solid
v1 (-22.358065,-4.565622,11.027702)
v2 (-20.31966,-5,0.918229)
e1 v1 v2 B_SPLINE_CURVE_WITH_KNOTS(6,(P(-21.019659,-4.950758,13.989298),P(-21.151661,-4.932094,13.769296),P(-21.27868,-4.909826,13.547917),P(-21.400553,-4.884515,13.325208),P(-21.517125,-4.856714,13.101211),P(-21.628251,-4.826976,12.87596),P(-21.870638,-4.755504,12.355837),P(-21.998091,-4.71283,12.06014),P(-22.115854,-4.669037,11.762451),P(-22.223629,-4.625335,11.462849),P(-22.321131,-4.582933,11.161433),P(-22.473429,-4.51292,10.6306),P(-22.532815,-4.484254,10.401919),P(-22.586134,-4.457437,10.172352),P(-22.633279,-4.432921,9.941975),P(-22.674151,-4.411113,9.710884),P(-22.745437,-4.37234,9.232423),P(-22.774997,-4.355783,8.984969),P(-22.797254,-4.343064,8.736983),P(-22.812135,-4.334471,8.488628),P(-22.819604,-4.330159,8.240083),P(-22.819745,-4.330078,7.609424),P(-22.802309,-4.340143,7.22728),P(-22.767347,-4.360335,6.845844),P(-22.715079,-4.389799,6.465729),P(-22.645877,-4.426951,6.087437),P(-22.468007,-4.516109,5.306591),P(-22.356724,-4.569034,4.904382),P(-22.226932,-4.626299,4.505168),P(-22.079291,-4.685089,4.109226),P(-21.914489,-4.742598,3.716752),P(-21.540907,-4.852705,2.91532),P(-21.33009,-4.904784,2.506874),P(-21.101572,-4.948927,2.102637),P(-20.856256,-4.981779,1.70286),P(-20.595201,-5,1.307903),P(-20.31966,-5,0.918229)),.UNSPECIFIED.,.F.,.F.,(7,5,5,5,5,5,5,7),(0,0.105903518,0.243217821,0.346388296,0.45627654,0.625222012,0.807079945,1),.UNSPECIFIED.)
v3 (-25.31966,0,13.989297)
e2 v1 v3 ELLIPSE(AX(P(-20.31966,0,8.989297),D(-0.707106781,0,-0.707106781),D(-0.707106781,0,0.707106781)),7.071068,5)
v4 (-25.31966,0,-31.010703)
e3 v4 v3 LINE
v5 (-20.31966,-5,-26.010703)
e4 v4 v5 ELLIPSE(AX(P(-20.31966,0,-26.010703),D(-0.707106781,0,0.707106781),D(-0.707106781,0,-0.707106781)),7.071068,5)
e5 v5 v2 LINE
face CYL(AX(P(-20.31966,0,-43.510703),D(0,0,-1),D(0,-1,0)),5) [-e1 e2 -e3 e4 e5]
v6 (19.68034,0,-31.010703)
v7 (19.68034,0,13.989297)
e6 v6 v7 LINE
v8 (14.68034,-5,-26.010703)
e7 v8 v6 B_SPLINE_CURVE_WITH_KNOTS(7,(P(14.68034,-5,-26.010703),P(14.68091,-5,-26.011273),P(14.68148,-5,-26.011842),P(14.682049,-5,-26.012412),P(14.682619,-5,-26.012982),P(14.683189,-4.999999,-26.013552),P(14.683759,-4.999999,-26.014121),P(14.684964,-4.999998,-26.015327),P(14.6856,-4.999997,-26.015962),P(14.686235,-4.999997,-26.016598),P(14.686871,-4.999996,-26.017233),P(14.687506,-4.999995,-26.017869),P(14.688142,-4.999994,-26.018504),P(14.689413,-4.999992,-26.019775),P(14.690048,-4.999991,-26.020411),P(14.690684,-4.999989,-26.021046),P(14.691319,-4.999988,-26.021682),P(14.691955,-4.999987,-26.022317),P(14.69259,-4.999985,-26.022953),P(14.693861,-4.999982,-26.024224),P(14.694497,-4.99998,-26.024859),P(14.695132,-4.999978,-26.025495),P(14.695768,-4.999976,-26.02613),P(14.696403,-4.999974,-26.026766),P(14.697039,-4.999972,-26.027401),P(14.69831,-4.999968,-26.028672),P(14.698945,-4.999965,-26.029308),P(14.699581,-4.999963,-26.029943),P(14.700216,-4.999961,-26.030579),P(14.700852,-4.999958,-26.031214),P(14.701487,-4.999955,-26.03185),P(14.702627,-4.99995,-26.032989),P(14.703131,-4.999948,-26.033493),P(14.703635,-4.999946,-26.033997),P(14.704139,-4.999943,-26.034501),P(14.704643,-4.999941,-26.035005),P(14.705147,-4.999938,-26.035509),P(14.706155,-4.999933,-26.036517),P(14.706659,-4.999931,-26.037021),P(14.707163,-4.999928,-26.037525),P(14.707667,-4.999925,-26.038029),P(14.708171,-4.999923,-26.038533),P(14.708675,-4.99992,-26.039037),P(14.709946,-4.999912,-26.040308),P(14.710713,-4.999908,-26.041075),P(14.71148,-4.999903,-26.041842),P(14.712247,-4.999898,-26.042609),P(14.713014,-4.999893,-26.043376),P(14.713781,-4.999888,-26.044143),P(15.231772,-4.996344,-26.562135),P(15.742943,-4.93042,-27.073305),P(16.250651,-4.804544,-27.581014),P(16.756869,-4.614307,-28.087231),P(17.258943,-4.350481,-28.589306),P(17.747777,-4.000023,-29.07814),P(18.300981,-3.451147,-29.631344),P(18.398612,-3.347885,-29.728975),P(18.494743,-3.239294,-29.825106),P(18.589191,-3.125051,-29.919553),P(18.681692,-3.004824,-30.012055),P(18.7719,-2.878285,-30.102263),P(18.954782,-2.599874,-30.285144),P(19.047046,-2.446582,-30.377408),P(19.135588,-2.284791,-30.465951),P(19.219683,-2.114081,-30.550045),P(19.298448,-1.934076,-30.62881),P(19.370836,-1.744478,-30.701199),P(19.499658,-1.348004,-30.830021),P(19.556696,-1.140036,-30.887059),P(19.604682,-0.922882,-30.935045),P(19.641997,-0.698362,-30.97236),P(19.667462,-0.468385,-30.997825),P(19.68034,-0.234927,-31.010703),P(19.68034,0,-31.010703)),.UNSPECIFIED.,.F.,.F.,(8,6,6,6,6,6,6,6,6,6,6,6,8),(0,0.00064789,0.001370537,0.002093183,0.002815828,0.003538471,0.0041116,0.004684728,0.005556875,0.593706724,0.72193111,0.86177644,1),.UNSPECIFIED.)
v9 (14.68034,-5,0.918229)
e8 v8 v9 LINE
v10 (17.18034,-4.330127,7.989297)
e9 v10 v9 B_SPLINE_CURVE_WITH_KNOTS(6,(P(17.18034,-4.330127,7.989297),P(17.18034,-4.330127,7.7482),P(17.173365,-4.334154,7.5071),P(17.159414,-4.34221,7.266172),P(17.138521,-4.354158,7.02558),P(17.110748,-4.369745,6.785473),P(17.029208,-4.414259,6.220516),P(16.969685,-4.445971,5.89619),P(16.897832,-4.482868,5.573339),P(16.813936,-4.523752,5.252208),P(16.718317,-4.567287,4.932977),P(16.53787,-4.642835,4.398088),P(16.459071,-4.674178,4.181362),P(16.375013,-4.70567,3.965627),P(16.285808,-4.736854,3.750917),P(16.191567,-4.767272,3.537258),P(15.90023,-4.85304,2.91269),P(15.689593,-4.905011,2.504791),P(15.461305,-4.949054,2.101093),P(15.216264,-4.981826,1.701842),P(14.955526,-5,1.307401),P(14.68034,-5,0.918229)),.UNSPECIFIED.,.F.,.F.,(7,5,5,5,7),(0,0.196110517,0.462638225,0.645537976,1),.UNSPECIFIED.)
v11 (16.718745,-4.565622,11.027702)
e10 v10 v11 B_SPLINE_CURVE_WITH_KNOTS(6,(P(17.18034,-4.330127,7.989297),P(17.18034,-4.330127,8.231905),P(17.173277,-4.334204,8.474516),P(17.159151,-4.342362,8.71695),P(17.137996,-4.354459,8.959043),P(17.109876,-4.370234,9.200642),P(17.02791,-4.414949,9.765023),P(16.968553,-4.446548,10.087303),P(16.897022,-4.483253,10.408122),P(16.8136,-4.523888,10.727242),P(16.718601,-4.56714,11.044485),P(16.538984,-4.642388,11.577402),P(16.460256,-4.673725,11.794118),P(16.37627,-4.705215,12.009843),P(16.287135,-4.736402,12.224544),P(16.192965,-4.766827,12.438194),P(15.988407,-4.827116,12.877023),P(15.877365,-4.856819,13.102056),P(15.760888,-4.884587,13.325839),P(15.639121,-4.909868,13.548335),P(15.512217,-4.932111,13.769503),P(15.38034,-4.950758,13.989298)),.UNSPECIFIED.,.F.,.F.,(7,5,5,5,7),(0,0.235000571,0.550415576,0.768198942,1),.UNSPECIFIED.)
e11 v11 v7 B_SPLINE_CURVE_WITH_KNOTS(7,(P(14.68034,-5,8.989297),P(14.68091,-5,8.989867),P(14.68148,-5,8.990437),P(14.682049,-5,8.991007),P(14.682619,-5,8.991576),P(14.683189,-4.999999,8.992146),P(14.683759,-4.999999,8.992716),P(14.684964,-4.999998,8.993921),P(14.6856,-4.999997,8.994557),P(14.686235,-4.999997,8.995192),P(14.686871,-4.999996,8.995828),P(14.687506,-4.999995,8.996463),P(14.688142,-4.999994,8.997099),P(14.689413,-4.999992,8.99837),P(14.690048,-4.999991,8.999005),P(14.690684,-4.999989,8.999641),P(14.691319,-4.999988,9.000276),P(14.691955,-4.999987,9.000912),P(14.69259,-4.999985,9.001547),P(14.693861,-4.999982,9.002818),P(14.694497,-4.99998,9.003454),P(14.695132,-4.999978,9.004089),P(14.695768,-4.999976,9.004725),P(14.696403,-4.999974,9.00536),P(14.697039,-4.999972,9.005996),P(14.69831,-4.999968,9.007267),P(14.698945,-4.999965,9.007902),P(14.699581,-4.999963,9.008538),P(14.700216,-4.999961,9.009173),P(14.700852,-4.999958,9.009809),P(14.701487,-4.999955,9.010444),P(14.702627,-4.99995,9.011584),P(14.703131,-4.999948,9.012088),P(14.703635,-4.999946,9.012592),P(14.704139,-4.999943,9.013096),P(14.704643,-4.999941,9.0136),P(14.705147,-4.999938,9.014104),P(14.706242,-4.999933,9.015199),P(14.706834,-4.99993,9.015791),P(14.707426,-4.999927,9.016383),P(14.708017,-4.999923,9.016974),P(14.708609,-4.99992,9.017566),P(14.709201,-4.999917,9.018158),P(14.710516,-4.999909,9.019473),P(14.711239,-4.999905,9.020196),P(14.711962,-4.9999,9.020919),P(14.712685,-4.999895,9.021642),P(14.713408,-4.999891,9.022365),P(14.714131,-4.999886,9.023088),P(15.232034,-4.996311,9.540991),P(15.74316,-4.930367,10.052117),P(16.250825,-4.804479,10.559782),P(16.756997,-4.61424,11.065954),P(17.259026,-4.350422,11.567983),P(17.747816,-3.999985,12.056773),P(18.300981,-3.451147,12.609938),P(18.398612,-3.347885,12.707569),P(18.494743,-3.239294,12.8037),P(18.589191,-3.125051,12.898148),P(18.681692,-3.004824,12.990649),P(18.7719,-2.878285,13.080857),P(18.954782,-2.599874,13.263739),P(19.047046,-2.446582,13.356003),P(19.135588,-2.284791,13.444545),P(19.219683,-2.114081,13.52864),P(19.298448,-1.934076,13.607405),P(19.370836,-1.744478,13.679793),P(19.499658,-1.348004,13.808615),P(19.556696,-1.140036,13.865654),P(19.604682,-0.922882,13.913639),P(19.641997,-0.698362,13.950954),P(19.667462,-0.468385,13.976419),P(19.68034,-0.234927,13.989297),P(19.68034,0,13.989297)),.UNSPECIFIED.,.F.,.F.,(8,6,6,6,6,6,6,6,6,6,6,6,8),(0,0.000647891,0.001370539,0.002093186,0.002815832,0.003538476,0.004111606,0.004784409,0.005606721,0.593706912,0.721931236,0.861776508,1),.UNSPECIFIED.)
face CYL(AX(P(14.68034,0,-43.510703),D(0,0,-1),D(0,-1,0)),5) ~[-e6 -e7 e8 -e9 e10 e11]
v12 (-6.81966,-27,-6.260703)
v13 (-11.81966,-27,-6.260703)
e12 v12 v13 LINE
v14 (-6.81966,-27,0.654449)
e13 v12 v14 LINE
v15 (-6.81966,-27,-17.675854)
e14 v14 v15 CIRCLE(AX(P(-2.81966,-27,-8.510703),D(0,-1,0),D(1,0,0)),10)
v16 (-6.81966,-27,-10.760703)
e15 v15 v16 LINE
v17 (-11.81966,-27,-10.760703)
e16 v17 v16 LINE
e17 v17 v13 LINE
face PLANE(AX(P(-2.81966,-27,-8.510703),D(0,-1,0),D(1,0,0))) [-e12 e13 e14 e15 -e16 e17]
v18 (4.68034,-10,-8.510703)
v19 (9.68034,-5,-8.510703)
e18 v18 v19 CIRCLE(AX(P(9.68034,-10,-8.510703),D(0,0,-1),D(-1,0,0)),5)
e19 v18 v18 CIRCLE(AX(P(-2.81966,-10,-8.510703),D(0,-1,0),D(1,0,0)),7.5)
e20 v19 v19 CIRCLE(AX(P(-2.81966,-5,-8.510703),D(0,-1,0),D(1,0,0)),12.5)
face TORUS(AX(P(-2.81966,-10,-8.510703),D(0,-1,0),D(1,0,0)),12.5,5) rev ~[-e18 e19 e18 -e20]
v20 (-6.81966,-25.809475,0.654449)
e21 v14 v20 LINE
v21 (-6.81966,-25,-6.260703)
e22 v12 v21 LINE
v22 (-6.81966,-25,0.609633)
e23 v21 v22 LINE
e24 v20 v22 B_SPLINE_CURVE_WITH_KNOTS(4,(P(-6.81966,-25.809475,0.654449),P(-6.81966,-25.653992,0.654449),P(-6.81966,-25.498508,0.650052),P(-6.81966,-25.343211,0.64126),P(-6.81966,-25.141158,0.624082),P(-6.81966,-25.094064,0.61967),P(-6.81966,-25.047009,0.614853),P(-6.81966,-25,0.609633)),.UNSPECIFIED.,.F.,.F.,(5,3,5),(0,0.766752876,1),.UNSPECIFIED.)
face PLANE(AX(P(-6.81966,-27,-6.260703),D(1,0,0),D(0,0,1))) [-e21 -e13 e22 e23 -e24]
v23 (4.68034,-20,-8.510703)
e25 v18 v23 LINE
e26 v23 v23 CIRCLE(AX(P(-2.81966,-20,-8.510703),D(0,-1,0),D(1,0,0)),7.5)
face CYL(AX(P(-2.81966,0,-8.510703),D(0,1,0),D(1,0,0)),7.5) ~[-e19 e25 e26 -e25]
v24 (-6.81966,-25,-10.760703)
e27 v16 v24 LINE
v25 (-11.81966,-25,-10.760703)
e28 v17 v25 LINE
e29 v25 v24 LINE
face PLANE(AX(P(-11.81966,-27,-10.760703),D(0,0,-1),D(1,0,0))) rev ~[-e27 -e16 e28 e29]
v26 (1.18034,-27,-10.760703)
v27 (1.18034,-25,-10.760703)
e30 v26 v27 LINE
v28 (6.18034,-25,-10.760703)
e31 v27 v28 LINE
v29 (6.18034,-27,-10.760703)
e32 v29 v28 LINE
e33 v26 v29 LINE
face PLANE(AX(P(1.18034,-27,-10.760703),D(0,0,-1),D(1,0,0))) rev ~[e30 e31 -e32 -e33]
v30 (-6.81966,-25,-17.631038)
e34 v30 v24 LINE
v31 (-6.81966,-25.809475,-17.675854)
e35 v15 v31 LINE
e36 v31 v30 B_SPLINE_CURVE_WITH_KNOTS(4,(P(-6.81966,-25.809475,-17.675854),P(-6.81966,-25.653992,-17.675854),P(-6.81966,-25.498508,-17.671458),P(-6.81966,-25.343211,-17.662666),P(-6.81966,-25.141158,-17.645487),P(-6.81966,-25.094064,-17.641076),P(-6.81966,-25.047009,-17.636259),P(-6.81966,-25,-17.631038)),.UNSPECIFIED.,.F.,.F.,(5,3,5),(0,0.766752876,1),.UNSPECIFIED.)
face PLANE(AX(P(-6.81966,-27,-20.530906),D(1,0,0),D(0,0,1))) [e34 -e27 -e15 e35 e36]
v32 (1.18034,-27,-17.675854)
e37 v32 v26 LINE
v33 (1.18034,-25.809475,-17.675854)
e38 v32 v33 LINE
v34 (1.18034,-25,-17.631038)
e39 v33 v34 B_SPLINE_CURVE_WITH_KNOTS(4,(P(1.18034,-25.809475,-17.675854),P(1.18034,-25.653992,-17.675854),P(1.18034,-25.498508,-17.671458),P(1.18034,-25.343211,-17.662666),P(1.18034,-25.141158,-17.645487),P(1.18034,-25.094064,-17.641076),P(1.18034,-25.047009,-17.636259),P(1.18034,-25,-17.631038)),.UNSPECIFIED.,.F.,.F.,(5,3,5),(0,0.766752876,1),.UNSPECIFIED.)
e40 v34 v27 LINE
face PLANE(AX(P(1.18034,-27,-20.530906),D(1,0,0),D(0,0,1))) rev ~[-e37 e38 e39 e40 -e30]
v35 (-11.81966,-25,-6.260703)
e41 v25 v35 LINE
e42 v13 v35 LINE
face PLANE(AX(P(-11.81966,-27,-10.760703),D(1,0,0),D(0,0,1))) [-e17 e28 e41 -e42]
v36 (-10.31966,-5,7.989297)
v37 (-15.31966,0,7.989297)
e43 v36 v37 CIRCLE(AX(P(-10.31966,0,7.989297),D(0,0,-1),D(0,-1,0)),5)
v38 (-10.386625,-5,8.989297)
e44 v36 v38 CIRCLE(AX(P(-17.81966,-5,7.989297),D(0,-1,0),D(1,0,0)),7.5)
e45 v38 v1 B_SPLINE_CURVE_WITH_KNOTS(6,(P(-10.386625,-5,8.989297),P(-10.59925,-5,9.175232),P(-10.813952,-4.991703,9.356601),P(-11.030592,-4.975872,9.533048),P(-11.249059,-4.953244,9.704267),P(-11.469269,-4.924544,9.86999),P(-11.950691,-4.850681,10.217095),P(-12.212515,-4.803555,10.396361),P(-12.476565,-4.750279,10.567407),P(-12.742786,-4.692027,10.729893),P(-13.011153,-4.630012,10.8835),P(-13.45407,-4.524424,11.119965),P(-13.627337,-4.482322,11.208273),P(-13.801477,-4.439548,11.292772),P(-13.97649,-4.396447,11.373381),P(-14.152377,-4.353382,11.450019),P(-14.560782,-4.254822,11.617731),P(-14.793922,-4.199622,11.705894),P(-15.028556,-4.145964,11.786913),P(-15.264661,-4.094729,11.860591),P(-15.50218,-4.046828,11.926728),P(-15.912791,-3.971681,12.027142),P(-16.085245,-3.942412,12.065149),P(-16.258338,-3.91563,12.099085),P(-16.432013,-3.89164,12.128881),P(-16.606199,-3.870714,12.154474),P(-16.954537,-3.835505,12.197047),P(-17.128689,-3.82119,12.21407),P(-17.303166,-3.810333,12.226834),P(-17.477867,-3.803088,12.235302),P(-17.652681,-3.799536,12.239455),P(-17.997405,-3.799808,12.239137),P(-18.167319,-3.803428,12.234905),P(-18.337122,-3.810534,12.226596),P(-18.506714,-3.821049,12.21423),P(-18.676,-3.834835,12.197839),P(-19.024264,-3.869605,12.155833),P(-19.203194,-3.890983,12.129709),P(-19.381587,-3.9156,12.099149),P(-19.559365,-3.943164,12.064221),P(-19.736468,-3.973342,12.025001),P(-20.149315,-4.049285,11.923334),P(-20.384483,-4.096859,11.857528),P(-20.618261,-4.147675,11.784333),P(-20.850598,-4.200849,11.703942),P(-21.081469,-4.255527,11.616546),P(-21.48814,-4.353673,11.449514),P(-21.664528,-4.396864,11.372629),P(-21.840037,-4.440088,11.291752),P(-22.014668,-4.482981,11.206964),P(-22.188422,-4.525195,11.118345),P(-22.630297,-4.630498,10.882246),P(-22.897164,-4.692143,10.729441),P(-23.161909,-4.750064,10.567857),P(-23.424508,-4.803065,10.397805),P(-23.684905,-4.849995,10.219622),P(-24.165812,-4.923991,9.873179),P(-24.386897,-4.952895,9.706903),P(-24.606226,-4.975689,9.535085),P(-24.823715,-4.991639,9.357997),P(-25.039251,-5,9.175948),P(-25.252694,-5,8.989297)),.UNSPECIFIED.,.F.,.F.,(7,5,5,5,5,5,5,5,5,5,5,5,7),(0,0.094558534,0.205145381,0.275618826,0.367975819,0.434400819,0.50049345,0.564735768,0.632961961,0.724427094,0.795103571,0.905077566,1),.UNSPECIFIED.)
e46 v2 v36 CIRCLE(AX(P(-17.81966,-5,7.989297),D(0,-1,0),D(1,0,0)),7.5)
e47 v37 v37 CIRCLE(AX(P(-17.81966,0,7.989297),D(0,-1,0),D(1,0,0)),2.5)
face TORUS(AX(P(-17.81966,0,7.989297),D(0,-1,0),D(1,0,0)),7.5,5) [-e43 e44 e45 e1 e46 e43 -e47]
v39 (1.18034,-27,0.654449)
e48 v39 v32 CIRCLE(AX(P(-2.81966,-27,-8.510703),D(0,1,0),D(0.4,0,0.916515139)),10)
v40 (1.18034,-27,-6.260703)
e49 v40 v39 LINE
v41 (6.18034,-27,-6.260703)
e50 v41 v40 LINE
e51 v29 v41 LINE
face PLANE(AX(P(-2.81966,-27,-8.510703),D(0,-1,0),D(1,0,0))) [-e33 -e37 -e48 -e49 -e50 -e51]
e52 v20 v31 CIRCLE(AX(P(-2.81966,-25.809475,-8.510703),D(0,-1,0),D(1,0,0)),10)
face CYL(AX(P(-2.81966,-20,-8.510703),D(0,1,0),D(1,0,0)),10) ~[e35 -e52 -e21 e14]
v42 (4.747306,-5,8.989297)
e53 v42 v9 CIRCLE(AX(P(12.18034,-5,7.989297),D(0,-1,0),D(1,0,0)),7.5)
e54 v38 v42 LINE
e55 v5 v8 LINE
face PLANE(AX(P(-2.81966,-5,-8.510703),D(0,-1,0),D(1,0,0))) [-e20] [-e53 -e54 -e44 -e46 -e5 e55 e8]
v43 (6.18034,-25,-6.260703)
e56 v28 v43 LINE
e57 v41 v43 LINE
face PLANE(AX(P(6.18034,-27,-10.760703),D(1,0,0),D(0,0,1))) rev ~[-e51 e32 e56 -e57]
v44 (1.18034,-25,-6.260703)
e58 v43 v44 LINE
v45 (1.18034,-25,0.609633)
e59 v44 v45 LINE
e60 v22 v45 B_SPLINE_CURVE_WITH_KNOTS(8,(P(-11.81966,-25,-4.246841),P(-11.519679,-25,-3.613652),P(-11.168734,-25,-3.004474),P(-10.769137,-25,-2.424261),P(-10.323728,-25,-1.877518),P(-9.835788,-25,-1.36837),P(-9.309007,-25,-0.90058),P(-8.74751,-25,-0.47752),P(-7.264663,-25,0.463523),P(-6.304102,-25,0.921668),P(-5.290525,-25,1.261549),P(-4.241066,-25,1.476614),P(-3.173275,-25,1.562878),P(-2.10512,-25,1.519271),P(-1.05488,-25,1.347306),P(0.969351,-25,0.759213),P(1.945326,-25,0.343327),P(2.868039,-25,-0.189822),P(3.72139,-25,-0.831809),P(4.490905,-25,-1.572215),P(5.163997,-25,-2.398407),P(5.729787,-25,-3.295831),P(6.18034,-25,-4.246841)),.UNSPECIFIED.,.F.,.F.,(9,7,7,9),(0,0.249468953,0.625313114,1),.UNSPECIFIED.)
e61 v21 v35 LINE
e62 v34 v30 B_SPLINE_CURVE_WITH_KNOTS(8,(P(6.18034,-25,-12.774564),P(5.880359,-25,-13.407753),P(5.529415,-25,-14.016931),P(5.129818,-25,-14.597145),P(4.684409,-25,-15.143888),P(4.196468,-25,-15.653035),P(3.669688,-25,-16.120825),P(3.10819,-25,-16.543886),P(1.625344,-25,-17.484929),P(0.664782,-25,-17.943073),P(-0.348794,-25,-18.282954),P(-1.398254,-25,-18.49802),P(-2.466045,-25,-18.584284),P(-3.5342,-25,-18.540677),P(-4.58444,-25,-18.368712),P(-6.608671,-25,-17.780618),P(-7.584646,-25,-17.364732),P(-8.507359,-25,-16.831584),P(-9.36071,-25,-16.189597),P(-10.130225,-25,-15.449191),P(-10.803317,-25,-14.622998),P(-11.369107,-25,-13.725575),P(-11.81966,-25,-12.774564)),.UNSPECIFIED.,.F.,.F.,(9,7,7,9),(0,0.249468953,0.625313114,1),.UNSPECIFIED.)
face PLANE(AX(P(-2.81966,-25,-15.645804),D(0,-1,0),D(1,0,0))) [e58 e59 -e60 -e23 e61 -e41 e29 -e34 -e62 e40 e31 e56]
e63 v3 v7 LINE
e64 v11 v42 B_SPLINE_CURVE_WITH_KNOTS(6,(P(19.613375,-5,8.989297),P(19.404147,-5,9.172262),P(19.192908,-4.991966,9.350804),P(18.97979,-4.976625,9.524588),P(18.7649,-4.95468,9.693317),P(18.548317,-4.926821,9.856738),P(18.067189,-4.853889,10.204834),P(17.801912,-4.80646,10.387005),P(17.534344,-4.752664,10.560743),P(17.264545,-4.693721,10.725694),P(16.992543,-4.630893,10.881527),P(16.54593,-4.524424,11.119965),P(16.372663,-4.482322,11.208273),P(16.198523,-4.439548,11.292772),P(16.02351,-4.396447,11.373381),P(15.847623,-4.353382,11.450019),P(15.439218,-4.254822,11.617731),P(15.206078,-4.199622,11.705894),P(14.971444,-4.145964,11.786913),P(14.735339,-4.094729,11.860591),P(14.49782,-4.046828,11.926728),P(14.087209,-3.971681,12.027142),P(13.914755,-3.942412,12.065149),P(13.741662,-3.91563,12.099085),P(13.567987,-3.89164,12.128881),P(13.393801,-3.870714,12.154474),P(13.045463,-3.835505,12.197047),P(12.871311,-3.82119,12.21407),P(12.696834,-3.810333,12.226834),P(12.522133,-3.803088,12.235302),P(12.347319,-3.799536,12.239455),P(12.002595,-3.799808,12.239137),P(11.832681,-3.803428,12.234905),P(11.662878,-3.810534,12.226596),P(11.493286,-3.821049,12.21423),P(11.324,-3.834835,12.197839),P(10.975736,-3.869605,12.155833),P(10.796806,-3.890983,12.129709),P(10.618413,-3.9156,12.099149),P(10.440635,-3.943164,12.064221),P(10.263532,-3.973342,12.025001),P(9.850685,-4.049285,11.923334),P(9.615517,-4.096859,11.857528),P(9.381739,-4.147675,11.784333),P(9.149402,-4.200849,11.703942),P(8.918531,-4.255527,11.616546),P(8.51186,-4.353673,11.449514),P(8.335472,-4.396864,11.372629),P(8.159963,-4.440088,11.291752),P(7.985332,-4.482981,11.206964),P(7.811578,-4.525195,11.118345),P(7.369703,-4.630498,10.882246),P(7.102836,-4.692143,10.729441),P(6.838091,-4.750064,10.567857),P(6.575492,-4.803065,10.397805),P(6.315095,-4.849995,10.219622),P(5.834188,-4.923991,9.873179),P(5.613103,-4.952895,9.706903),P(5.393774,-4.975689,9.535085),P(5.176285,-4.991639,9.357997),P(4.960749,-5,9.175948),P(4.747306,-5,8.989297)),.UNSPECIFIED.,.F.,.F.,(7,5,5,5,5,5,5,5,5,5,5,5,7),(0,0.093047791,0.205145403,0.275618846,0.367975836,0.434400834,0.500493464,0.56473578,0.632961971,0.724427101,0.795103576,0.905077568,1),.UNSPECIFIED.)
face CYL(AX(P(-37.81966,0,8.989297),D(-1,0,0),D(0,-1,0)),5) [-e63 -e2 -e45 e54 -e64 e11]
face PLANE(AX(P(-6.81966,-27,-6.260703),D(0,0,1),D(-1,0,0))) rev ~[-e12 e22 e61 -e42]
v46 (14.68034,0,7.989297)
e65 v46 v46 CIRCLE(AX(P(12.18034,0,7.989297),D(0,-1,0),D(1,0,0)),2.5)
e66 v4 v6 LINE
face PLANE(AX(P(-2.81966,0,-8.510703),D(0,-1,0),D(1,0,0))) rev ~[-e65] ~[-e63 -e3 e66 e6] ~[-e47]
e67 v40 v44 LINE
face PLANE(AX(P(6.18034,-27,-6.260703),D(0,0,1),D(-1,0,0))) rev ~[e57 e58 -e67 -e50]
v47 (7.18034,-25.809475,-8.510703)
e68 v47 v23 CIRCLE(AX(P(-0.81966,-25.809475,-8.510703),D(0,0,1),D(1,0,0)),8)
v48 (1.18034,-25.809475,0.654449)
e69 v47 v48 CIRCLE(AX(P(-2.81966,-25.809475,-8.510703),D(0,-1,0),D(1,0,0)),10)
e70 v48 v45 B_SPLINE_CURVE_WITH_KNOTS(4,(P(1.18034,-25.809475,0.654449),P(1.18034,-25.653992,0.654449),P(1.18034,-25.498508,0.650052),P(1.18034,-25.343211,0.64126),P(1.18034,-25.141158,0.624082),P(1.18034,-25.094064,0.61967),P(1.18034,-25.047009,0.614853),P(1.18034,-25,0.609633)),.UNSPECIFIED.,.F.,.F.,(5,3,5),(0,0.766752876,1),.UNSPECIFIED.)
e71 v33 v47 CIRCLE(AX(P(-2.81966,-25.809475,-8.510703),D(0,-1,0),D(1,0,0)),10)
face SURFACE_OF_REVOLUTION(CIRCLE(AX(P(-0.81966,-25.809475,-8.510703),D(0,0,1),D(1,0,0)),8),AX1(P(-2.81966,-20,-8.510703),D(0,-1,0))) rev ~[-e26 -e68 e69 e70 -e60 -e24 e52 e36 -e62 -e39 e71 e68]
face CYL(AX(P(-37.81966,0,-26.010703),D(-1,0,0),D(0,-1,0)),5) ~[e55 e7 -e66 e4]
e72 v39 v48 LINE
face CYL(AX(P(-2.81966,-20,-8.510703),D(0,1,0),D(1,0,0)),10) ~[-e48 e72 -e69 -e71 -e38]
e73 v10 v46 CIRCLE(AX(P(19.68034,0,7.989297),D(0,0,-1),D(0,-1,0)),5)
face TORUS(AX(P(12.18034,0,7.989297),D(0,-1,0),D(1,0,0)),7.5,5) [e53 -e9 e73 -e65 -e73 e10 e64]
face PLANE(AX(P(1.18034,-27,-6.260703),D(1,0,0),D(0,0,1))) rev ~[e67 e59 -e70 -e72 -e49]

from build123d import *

# Parameters (mm, degrees)
F0_R        = 7.5
F1_DEPTH    = 20
F0_W        = 45
F0_H        = 45
F2_DEPTH    = 5
F3_R        = 2.5
F4_DEPTH    = 25
F5_R        = 10
F5_R_2      = 7.5
F6_DEPTH    = 7
F7_W        = 8
F7_H        = 9.7702028193
F7_W_2      = 5
F7_H_2      = 4.5
F8_DEPTH    = 2
F9_T3_DEPTH = 70
F9_T5_DEPTH = 70


# Not quite as in the source:
# - a fillet or chamfer that OpenCascade refuses, or shapes differently, is made with other operations: its cross-section is extruded or revolved along the edge and cut away or added


with BuildPart() as f1:
    # F0 (on Front) → F1 (new body)
    with BuildSketch(Plane.XZ):
        with Locations((-2.8196598027, -8.5107027553)):
            Circle(F0_R)
    extrude(amount=F1_DEPTH)

    # F0 (on Front) → F2 (join)
    with BuildSketch(Plane.XZ):
        with Locations((-2.8196598027, -8.5107027553)):
            Rectangle(F0_W, F0_H)
        with Locations((-2.8196598027, -8.5107027553)):
            Circle(F0_R, mode=Mode.SUBTRACT)
    extrude(amount=F2_DEPTH)

    # F3 (on face) → F4 (cut)
    with BuildSketch(Plane.XZ.offset(5)):
        with Locations((12.1803401973, 7.9892972447)):
            Circle(F3_R)
        with Locations((-17.8196598027, 7.9892972447)):
            Circle(F3_R)
    extrude(amount=-F4_DEPTH, mode=Mode.SUBTRACT)

    # F5 (on face) → F6 (join)
    with BuildSketch(Plane.XZ.offset(20)):
        with Locations((-2.8196598027, -8.5107027553)):
            Circle(F5_R)
        with Locations((-2.8196598027, -8.5107027553)):
            Circle(F5_R_2, mode=Mode.SUBTRACT)
        with Locations((-2.8196598027, -8.5107027553)):
            Circle(F5_R_2)
    extrude(amount=F6_DEPTH)

    # F7 (on face) → F8 (cut)
    with BuildSketch(Plane.XZ.offset(27)):
        with Locations((-2.8196598027, -15.6458041649)):
            Rectangle(F7_W, F7_H)
        with Locations((-9.3196598027, -8.5107027553)):
            Rectangle(F7_W_2, F7_H_2)
        with Locations((-2.8196598027, -8.5107027553)):
            Rectangle(F7_W, F7_H_2)
        with Locations((3.6803401973, -8.5107027553)):
            Rectangle(F7_W_2, F7_H_2)
        with Locations((-2.8196598027, -1.3756013457)):
            Rectangle(F7_W, F7_H)
    extrude(amount=-F8_DEPTH, mode=Mode.SUBTRACT)

    # F9: fillet of radius 5 on 7 edges, made by hand

    # F9_s1 → F9_t2 (revolve)
    with BuildSketch(Plane.XY.offset(-8.5107027553)):
        with BuildLine():
            ThreePointArc((4.6803401973, -10), (6.1448062914, -6.4644660941), (9.6803401973, -5))
            Line((9.6803401973, -5), (4.6803401973, -5))
            Line((4.6803401973, -5), (4.6803401973, -10))
        make_face()
    revolve(axis=Axis((-2.8196598027, -5, -8.5107027553), (0, -1, 0)))

    # F9_s4 → F9_t3 (cut)
    with BuildSketch(Plane.YZ.offset(-37.8196598027)):
        with BuildLine():
            ThreePointArc((-5, 8.9892972447), (-3.5355339059, 12.5248311506), (0, 13.9892972447))
            Line((0, 13.9892972447), (-5, 13.9892972447))
            Line((-5, 13.9892972447), (-5, 8.9892972447))
        make_face()
        with BuildLine():
            ThreePointArc((-5, -26.0107027553), (-3.5355339059, -29.5462366612), (0, -31.0107027553))
            Line((0, -31.0107027553), (-5, -31.0107027553))
            Line((-5, -31.0107027553), (-5, -26.0107027553))
        make_face()
    extrude(amount=F9_T3_DEPTH, mode=Mode.SUBTRACT)

    # F9_s6 → F9_t5 (cut)
    with BuildSketch(Plane.XY.offset(-43.5107027553)):
        with BuildLine():
            ThreePointArc((14.6803401973, -5), (18.2158741033, -3.5355339059), (19.6803401973, 0))
            Line((19.6803401973, 0), (19.6803401973, -5))
            Line((19.6803401973, -5), (14.6803401973, -5))
        make_face()
        with BuildLine():
            ThreePointArc((-20.3196598027, -5), (-23.8551937086, -3.5355339059), (-25.3196598027, 0))
            Line((-25.3196598027, 0), (-25.3196598027, -5))
            Line((-25.3196598027, -5), (-20.3196598027, -5))
        make_face()
    extrude(amount=F9_T5_DEPTH, mode=Mode.SUBTRACT)

    # F9_s7 → F9_t8 (revolve, cut)
    with BuildSketch(Plane.XY.offset(7.9892972447)):
        with BuildLine():
            ThreePointArc((-10.3196598027, -5), (-13.8551937086, -3.5355339059), (-15.3196598027, 0))
            Line((-15.3196598027, 0), (-15.3196598027, -5))
            Line((-15.3196598027, -5), (-10.3196598027, -5))
        make_face()
    revolve(axis=Axis((-17.8196598027, -5, 7.9892972447), (0, -1, 0)), mode=Mode.SUBTRACT)

    # F9_s9 → F9_t10 (revolve, cut)
    with BuildSketch(Plane.XY.offset(7.9892972447)):
        with BuildLine():
            ThreePointArc((19.6803401973, -5), (16.1448062914, -3.5355339059), (14.6803401973, 0))
            Line((14.6803401973, 0), (14.6803401973, -5))
            Line((14.6803401973, -5), (19.6803401973, -5))
        make_face()
    revolve(axis=Axis((12.1803401973, -5, 7.9892972447), (0, -1, 0)), mode=Mode.SUBTRACT)

    # F10: fillet of radius 8 on 1 edges, made by hand

    # F10_s1 → F10_t2 (revolve, cut)
    with BuildSketch(Plane.XY.offset(-8.5107027553)):
        with BuildLine():
            ThreePointArc((7.1803401973, -25.8094750193), (6.5288094257, -22.6471973591), (4.6803401973, -20))
            Line((4.6803401973, -20), (7.1803401973, -20))
            Line((7.1803401973, -20), (7.1803401973, -25.8094750193))
        make_face()
    revolve(axis=Axis((-2.8196598027, -20, -8.5107027553), (0, -1, 0)), mode=Mode.SUBTRACT)


solid = f1.part
